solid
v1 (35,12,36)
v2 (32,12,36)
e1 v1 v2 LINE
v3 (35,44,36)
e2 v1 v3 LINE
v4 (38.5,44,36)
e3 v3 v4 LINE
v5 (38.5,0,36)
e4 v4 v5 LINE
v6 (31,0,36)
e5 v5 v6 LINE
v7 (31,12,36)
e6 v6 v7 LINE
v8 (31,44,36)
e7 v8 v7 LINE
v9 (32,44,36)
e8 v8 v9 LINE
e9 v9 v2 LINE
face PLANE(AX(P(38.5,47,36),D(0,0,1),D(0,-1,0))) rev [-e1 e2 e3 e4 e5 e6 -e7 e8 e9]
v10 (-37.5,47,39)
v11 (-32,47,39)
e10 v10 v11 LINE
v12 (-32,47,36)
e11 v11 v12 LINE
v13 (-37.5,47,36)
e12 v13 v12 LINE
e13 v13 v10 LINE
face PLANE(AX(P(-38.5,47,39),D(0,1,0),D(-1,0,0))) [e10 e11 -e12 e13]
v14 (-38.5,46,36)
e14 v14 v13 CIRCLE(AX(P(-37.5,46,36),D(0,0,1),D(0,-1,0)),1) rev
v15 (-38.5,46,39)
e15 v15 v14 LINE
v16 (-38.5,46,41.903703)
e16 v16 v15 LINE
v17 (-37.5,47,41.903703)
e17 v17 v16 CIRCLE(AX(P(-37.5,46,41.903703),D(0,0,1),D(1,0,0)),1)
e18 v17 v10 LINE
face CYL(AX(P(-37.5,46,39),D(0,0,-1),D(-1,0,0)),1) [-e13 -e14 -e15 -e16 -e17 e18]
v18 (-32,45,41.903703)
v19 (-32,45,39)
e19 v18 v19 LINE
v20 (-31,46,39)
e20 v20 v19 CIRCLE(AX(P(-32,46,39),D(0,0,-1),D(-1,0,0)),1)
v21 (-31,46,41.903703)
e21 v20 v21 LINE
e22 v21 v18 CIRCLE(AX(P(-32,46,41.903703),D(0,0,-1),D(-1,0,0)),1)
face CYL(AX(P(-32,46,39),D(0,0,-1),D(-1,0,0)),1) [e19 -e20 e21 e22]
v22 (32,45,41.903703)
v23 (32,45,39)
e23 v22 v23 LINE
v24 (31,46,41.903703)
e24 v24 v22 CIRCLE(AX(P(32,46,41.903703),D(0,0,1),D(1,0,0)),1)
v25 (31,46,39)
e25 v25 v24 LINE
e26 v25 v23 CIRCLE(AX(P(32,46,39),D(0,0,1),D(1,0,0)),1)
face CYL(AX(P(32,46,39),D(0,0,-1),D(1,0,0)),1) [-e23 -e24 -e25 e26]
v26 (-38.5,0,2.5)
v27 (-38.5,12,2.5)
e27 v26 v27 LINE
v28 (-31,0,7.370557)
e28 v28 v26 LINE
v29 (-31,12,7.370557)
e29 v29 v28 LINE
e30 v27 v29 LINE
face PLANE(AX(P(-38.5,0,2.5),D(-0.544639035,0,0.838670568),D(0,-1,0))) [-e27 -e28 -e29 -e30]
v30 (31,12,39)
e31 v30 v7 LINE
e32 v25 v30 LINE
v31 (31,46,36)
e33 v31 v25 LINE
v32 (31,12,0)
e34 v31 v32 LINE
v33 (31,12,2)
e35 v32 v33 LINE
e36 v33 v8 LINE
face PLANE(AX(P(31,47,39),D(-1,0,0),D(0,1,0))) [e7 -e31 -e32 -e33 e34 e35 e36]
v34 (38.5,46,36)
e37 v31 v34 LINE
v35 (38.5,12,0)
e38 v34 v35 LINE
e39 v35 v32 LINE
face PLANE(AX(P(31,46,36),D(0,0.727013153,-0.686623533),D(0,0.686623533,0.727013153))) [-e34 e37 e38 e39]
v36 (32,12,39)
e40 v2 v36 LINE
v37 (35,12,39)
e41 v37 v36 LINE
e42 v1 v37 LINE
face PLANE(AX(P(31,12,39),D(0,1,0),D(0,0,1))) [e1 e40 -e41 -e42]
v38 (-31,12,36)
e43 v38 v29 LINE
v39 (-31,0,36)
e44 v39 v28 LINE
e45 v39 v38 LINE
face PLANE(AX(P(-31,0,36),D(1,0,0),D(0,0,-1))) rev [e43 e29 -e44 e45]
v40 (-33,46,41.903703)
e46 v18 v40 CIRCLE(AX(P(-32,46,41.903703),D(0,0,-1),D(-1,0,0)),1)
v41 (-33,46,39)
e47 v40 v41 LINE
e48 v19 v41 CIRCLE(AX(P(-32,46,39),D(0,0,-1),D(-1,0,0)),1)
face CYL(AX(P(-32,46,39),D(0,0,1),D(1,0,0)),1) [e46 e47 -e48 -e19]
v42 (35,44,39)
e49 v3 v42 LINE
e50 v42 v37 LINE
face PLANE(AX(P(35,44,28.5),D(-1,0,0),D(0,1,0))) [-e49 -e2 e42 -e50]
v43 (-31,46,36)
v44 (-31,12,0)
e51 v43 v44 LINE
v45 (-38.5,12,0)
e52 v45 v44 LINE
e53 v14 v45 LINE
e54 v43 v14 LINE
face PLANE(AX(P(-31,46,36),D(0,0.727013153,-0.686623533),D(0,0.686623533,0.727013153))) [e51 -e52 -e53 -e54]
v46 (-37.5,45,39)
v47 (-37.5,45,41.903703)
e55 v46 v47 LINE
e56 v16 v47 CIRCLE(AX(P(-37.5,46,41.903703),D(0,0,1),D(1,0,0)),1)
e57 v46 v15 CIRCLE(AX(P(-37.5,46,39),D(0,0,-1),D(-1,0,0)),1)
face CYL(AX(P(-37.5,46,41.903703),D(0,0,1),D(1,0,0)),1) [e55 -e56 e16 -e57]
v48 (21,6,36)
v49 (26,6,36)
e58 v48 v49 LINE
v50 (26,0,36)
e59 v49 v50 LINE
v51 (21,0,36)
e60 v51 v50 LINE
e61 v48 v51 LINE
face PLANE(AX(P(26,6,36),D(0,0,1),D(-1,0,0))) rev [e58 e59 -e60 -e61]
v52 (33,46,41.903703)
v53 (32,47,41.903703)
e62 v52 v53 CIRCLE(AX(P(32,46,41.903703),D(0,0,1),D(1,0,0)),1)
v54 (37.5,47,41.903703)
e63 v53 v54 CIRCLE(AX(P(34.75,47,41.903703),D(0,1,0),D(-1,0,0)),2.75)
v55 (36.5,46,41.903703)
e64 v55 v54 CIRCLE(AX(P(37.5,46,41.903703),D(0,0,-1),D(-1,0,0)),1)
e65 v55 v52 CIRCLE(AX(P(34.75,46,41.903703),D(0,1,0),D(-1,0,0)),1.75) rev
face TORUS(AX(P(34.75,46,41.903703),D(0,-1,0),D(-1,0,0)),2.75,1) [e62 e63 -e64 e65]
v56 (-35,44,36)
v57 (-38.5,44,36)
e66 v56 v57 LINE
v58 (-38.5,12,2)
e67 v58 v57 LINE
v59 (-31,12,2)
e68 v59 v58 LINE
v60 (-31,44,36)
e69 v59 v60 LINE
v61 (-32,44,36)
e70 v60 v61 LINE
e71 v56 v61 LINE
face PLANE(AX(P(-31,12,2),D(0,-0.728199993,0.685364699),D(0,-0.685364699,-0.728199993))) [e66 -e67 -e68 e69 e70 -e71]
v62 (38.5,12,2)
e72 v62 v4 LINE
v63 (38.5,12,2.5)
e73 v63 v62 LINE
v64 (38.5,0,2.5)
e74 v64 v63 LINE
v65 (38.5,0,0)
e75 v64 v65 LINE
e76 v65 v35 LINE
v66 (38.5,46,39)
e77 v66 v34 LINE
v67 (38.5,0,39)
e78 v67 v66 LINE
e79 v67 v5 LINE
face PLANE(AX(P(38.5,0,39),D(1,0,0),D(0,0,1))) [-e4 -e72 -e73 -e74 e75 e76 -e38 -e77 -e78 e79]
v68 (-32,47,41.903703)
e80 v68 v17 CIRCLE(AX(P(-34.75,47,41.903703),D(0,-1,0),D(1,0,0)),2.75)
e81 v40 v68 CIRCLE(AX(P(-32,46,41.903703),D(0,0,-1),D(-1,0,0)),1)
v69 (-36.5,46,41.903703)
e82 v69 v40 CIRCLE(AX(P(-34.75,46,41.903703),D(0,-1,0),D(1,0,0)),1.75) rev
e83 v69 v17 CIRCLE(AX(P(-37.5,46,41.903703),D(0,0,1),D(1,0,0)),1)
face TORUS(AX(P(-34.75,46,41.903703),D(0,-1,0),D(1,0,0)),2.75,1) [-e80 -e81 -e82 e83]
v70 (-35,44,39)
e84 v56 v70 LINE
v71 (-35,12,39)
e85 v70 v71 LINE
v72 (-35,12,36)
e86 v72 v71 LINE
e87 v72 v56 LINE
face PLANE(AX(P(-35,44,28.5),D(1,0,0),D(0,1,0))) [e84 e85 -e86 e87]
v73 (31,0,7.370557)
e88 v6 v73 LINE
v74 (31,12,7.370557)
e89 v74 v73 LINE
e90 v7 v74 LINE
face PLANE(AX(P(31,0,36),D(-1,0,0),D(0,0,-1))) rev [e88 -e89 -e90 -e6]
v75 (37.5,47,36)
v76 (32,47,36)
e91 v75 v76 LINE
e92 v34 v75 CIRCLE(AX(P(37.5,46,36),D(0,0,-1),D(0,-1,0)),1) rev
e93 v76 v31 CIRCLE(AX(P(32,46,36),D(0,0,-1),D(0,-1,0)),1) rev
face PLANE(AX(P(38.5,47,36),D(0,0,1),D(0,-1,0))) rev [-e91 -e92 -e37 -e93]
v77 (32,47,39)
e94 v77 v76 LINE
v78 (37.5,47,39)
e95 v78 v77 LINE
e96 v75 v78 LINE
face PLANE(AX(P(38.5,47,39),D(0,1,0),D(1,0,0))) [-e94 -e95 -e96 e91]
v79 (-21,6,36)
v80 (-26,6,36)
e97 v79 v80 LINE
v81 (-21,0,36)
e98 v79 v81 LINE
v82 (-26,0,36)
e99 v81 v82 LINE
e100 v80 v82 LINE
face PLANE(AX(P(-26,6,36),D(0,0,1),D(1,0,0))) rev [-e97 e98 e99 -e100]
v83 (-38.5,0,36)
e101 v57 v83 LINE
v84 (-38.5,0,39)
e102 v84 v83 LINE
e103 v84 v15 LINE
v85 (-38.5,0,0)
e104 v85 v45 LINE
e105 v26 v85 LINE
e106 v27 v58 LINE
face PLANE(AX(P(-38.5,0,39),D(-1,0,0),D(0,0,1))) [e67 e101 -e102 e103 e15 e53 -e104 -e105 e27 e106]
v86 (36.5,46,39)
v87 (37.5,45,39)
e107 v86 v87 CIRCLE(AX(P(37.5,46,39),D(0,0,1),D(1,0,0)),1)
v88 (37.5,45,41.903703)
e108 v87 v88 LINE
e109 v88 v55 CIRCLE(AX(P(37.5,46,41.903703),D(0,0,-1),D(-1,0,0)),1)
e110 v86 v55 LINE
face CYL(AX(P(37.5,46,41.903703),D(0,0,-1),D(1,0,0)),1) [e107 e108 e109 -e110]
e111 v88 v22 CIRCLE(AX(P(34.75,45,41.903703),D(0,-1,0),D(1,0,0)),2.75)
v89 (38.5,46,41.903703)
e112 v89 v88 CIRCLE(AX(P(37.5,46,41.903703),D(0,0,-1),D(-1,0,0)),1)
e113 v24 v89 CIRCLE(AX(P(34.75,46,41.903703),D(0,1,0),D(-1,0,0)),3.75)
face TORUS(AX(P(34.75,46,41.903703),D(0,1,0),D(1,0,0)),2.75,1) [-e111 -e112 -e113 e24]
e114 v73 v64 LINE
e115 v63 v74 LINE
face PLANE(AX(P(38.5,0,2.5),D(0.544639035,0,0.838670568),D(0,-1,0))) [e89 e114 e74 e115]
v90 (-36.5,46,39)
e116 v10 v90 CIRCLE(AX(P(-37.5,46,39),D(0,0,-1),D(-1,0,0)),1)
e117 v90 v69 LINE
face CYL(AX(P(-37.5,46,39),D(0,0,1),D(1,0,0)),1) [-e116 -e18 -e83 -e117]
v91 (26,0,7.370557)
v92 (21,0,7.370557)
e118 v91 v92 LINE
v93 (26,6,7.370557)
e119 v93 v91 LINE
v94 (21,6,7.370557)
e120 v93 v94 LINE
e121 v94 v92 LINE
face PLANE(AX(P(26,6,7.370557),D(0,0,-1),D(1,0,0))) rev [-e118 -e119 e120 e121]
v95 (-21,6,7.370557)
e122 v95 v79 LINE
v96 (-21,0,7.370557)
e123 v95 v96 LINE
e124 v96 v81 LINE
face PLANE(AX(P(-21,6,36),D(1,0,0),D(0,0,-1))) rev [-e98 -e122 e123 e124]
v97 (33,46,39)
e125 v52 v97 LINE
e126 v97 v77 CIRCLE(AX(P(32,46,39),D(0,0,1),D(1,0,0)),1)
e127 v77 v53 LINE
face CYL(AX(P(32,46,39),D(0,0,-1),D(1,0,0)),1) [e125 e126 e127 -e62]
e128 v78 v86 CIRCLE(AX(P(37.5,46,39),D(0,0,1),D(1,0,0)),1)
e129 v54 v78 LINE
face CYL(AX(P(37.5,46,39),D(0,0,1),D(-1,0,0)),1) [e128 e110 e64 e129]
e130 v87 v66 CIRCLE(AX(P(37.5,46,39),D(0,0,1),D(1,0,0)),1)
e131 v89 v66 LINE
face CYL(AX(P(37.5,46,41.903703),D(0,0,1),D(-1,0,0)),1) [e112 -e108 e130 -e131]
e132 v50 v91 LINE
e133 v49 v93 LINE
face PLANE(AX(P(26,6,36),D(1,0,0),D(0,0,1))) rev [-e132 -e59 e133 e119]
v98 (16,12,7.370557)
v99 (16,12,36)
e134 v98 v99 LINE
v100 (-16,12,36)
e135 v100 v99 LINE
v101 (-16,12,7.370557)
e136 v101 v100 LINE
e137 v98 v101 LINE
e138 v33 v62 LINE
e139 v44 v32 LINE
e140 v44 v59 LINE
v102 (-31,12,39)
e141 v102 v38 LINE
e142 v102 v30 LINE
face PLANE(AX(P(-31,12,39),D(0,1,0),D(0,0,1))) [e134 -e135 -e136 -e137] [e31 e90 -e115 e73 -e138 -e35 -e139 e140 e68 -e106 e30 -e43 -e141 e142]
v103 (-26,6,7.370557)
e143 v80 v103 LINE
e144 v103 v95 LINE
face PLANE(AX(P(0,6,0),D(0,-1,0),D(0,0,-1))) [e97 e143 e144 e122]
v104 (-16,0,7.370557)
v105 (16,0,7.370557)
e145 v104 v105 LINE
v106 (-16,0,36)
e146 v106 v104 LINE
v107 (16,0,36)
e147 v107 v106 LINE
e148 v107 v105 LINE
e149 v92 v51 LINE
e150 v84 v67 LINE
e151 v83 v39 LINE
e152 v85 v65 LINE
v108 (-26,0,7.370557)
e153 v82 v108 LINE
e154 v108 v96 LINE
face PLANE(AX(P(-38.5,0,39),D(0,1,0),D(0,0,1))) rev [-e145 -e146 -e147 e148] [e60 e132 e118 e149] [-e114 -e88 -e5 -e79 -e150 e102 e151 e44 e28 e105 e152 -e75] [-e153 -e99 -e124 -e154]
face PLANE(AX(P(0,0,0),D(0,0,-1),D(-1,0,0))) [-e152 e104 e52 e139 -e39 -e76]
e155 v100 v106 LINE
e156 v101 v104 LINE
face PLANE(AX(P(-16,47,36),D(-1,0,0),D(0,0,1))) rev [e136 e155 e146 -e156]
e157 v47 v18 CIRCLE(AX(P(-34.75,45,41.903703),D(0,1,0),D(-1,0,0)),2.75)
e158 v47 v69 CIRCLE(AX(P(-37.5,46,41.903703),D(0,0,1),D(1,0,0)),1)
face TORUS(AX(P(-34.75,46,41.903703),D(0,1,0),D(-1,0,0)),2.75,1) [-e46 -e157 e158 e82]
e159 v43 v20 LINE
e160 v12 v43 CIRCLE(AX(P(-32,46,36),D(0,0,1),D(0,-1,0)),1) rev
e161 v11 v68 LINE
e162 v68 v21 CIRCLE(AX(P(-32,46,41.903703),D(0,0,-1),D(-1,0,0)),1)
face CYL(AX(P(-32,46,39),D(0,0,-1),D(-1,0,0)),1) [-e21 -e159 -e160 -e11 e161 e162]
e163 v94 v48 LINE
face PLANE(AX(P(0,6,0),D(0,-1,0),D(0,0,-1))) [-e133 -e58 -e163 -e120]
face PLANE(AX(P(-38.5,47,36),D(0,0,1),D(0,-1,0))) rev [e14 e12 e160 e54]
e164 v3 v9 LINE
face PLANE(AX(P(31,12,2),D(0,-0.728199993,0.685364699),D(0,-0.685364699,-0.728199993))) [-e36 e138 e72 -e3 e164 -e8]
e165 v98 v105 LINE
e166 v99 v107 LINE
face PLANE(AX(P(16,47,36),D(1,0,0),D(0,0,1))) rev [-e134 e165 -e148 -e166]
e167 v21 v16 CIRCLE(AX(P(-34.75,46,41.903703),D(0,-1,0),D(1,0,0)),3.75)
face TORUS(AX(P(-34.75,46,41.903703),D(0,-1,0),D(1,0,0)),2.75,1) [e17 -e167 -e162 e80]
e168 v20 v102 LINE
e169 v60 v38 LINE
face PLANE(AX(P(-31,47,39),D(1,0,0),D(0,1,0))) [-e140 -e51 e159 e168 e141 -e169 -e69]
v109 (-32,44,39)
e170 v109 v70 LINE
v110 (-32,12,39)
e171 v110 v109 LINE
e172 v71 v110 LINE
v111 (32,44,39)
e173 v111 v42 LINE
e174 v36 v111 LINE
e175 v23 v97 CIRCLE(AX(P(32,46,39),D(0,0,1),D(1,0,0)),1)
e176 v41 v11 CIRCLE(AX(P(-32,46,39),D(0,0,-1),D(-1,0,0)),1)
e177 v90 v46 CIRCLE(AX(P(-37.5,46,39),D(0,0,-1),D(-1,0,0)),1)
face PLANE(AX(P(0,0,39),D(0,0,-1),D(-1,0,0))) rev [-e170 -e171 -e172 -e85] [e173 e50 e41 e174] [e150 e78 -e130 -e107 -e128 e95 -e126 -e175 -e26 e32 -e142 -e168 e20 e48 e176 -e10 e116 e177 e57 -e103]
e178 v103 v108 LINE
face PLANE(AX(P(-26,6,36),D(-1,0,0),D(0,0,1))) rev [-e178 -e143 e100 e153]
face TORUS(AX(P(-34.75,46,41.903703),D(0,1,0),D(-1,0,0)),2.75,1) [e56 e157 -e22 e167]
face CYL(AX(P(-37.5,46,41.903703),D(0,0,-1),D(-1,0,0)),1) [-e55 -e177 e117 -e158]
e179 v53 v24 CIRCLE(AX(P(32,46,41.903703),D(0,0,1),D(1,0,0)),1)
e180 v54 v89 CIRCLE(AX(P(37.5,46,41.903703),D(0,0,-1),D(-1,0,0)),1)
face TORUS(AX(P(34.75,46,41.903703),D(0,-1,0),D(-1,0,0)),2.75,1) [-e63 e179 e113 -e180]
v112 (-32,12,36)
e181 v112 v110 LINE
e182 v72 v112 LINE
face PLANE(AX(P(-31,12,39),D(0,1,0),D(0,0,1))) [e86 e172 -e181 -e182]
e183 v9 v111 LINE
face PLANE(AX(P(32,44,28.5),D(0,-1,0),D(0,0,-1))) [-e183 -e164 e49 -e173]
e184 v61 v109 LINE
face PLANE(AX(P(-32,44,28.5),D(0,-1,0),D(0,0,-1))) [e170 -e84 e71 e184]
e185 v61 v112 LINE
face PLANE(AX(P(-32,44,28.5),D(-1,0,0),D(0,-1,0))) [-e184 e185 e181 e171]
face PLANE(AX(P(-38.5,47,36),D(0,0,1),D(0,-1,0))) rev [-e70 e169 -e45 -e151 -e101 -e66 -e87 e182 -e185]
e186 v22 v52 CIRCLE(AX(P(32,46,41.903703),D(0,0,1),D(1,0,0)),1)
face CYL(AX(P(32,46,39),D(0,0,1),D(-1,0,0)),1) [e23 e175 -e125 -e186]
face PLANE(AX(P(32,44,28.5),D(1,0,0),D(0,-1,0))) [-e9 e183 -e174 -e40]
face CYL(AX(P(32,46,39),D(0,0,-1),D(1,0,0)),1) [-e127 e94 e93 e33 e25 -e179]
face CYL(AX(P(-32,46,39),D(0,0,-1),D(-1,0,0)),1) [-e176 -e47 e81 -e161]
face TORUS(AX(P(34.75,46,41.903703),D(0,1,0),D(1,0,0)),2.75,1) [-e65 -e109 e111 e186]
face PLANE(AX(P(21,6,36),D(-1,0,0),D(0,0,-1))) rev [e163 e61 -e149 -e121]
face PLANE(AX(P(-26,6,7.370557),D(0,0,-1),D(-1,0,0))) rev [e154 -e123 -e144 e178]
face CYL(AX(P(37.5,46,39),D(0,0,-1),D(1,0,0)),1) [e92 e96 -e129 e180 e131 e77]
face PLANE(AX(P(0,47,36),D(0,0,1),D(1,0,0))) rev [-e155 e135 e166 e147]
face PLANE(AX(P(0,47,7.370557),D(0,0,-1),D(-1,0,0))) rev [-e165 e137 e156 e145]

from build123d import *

# Parameters (mm, degrees)
BOSS_EXTRU_1_DEPTH           = 39
ESQUISSE2_W                  = 36
ESQUISSE2_H                  = 35
ENL_V_MAT_EXTRU_1_DEPTH      = 69.490875305
ENL_V_MAT_EXTRU_2_DEPTH      = 7.5
ENL_V_MAT_EXTRU_2_DEPTH_BACK = 39
ESQUISSE3_W                  = 3
ESQUISSE3_H                  = 32
ESQUISSE5_W                  = 7.5
ESQUISSE5_H                  = 28.5
ENL_V_MAT_EXTRU_3_DEPTH      = 66.024995194
ESQUISSE6_W                  = 2
ESQUISSE6_H                  = 2
CONG_2_R                     = 1
BOSS_EXTRU_3_DEPTH           = 7.5
CHANFREIN1_SIZE              = 5
CHANFREIN1_SIZE_2            = 7.699324819
ESQUISSE9_W                  = 5
ESQUISSE9_H                  = 28.629443051
ENL_V_MAT_EXTRU_4_DEPTH      = 6
ESQUISSE10_W                 = 16
ESQUISSE10_H                 = 28.629443051
ENL_V_MAT_EXTRU_6_DEPTH      = 76.996780236


# Some blends are built 0.0001 mm under size
with BuildPart() as part:
    # Esquisse1 → Boss.-Extru.1 (new body)
    with BuildSketch(Plane.XY):
        Polygon((-38.5, 0), (0, 0), (0, 12), (-31, 12), (-31, 47), (-38.5, 47), align=None)
    extrude(amount=BOSS_EXTRU_1_DEPTH)

    # Esquisse2 → Enlèv. mat.-Extru.1 (cut, through all)
    with BuildSketch(Plane(origin=(-31, 0, 0), x_dir=(0, 0, -1), z_dir=(1, 0, 0))):
        with Locations((-18, 29.5)):
            Rectangle(ESQUISSE2_W, ESQUISSE2_H)
    extrude(amount=-ENL_V_MAT_EXTRU_1_DEPTH, mode=Mode.SUBTRACT)

    # Esquisse3 → Enlèv. mat.-Extru.2 (cut, two sides: drawn at the far end of the back side and taken through both)
    with BuildSketch(Plane(origin=(0, 0, 36), x_dir=(-1, 0, 0), z_dir=(0, 0, -1)).offset(-ENL_V_MAT_EXTRU_2_DEPTH_BACK)):
        with Locations((33.5, 28)):
            Rectangle(ESQUISSE3_W, ESQUISSE3_H)
    extrude(amount=ENL_V_MAT_EXTRU_2_DEPTH + ENL_V_MAT_EXTRU_2_DEPTH_BACK, mode=Mode.SUBTRACT)

    # Esquisse5 → Enlèv. mat.-Extru.3 (cut, through all)
    with BuildSketch(Plane(origin=(0, 12, 0), x_dir=(1, 0, 0), z_dir=(0, 1, 0))):
        with Locations((-34.75, -21.75)):
            Rectangle(ESQUISSE5_W, ESQUISSE5_H)
    extrude(amount=-ENL_V_MAT_EXTRU_3_DEPTH, mode=Mode.SUBTRACT)

    # Balayage3: sweep along a path in Esquisse7
    with BuildLine(Plane(origin=(0, 47, 0), x_dir=(1, 0, 0), z_dir=(0, 1, 0))) as balayage3_path:
        Line((-37.5, -39), (-37.5, -41.903703094))
        ThreePointArc((-37.5, -41.903703094), (-34.75, -44.653703094), (-32, -41.903703094))
        Line((-32, -41.903703094), (-32, -39))
    # Esquisse6 → Balayage3 (sweep)
    with BuildSketch(Plane.XY.offset(39)):
        with Locations((-37.5, 46)):
            Rectangle(ESQUISSE6_W, ESQUISSE6_H)
    sweep(path=balayage3_path.line)

    # Congé2
    cong_2_edges = [part.edges().sort_by_distance(p)[0] for p in [
        (-31, 47, 38.951851547),
        (-38.5, 47, 38.951851547),
        (-31, 45, 40.451851547),
        (-33, 47, 40.451851547),
        (-38.5, 45, 40.451851547),
        (-36.5, 47, 40.451851547),
        (-33, 45, 40.451851547),
        (-34.75, 47, 45.653703094),
        (-34.75, 45, 45.653703094),
        (-34.75, 45, 43.653703094),
        (-34.75, 47, 43.653703094),
        (-36.5, 45, 40.451851547),
    ]]
    fillet(cong_2_edges, radius=CONG_2_R - 0.0001)  # a hair under: the kernel refuses the full size

    # Esquisse8 → Boss.-Extru.3 (add)
    with BuildSketch(Plane.ZY.offset(38.5)):
        Polygon((36, 46), (0, 12), (2, 12), (36, 44), align=None)
    extrude(amount=-BOSS_EXTRU_3_DEPTH)

    # Chanfrein1
    # the kernel refuses this chamfer: 7.699324819, 5 mm, written as the material it takes off along each edge
    with BuildSketch(Plane(origin=(-38.5, 31.898450737, 7.5), x_dir=(-0.04991856572298867, 0, -0.9987532912567346), z_dir=(0, -1, 0))) as chanfrein1_piece_1_section:
        Polygon((CHANFREIN1_SIZE * 0.998753291257, CHANFREIN1_SIZE * 0.049918565723), (-CHANFREIN1_SIZE_2 * 0.0499185657235, CHANFREIN1_SIZE_2 * 0.998753291266), (0, 0), align=None)
    chanfrein1_piece_1 = extrude(amount=51.796901474, mode=Mode.PRIVATE)
    chanfrein1_piece_1 = split(chanfrein1_piece_1, bisect_by=Plane(origin=(-31, 6, 5.832244488), z_dir=(-1, 0, 0)), keep=Keep.TOP, mode=Mode.PRIVATE)
    chanfrein1_piece_1 = split(chanfrein1_piece_1, bisect_by=Plane(origin=(-35.936911742, 11.0942578, 1.037648912), z_dir=(0, -0.7281999926928029, 0.685364699004991)), keep=Keep.TOP, mode=Mode.PRIVATE)
    add(chanfrein1_piece_1, mode=Mode.SUBTRACT)

    # Esquisse9 → Enlèv. mat.-Extru.4 (cut)
    with BuildSketch(Plane.XZ):
        with Locations((-23.5, 21.685278474)):
            Rectangle(ESQUISSE9_W, ESQUISSE9_H)
    extrude(amount=-ENL_V_MAT_EXTRU_4_DEPTH, mode=Mode.SUBTRACT)

    # Esquisse10 → Enlèv. mat.-Extru.6 (cut, through all)
    with BuildSketch(Plane.XZ):
        with Locations((-8, 21.685278474)):
            Rectangle(ESQUISSE10_W, ESQUISSE10_H)
    extrude(amount=-ENL_V_MAT_EXTRU_6_DEPTH, mode=Mode.SUBTRACT)

    # Symétrie1: part across plane


with BuildPart() as part_1:
    add(part.part)
    add(part.part.mirror(Plane(origin=(0, 12, 39), x_dir=(0, 0, 1), z_dir=(1, 0, 0))))


solid = part_1.part
